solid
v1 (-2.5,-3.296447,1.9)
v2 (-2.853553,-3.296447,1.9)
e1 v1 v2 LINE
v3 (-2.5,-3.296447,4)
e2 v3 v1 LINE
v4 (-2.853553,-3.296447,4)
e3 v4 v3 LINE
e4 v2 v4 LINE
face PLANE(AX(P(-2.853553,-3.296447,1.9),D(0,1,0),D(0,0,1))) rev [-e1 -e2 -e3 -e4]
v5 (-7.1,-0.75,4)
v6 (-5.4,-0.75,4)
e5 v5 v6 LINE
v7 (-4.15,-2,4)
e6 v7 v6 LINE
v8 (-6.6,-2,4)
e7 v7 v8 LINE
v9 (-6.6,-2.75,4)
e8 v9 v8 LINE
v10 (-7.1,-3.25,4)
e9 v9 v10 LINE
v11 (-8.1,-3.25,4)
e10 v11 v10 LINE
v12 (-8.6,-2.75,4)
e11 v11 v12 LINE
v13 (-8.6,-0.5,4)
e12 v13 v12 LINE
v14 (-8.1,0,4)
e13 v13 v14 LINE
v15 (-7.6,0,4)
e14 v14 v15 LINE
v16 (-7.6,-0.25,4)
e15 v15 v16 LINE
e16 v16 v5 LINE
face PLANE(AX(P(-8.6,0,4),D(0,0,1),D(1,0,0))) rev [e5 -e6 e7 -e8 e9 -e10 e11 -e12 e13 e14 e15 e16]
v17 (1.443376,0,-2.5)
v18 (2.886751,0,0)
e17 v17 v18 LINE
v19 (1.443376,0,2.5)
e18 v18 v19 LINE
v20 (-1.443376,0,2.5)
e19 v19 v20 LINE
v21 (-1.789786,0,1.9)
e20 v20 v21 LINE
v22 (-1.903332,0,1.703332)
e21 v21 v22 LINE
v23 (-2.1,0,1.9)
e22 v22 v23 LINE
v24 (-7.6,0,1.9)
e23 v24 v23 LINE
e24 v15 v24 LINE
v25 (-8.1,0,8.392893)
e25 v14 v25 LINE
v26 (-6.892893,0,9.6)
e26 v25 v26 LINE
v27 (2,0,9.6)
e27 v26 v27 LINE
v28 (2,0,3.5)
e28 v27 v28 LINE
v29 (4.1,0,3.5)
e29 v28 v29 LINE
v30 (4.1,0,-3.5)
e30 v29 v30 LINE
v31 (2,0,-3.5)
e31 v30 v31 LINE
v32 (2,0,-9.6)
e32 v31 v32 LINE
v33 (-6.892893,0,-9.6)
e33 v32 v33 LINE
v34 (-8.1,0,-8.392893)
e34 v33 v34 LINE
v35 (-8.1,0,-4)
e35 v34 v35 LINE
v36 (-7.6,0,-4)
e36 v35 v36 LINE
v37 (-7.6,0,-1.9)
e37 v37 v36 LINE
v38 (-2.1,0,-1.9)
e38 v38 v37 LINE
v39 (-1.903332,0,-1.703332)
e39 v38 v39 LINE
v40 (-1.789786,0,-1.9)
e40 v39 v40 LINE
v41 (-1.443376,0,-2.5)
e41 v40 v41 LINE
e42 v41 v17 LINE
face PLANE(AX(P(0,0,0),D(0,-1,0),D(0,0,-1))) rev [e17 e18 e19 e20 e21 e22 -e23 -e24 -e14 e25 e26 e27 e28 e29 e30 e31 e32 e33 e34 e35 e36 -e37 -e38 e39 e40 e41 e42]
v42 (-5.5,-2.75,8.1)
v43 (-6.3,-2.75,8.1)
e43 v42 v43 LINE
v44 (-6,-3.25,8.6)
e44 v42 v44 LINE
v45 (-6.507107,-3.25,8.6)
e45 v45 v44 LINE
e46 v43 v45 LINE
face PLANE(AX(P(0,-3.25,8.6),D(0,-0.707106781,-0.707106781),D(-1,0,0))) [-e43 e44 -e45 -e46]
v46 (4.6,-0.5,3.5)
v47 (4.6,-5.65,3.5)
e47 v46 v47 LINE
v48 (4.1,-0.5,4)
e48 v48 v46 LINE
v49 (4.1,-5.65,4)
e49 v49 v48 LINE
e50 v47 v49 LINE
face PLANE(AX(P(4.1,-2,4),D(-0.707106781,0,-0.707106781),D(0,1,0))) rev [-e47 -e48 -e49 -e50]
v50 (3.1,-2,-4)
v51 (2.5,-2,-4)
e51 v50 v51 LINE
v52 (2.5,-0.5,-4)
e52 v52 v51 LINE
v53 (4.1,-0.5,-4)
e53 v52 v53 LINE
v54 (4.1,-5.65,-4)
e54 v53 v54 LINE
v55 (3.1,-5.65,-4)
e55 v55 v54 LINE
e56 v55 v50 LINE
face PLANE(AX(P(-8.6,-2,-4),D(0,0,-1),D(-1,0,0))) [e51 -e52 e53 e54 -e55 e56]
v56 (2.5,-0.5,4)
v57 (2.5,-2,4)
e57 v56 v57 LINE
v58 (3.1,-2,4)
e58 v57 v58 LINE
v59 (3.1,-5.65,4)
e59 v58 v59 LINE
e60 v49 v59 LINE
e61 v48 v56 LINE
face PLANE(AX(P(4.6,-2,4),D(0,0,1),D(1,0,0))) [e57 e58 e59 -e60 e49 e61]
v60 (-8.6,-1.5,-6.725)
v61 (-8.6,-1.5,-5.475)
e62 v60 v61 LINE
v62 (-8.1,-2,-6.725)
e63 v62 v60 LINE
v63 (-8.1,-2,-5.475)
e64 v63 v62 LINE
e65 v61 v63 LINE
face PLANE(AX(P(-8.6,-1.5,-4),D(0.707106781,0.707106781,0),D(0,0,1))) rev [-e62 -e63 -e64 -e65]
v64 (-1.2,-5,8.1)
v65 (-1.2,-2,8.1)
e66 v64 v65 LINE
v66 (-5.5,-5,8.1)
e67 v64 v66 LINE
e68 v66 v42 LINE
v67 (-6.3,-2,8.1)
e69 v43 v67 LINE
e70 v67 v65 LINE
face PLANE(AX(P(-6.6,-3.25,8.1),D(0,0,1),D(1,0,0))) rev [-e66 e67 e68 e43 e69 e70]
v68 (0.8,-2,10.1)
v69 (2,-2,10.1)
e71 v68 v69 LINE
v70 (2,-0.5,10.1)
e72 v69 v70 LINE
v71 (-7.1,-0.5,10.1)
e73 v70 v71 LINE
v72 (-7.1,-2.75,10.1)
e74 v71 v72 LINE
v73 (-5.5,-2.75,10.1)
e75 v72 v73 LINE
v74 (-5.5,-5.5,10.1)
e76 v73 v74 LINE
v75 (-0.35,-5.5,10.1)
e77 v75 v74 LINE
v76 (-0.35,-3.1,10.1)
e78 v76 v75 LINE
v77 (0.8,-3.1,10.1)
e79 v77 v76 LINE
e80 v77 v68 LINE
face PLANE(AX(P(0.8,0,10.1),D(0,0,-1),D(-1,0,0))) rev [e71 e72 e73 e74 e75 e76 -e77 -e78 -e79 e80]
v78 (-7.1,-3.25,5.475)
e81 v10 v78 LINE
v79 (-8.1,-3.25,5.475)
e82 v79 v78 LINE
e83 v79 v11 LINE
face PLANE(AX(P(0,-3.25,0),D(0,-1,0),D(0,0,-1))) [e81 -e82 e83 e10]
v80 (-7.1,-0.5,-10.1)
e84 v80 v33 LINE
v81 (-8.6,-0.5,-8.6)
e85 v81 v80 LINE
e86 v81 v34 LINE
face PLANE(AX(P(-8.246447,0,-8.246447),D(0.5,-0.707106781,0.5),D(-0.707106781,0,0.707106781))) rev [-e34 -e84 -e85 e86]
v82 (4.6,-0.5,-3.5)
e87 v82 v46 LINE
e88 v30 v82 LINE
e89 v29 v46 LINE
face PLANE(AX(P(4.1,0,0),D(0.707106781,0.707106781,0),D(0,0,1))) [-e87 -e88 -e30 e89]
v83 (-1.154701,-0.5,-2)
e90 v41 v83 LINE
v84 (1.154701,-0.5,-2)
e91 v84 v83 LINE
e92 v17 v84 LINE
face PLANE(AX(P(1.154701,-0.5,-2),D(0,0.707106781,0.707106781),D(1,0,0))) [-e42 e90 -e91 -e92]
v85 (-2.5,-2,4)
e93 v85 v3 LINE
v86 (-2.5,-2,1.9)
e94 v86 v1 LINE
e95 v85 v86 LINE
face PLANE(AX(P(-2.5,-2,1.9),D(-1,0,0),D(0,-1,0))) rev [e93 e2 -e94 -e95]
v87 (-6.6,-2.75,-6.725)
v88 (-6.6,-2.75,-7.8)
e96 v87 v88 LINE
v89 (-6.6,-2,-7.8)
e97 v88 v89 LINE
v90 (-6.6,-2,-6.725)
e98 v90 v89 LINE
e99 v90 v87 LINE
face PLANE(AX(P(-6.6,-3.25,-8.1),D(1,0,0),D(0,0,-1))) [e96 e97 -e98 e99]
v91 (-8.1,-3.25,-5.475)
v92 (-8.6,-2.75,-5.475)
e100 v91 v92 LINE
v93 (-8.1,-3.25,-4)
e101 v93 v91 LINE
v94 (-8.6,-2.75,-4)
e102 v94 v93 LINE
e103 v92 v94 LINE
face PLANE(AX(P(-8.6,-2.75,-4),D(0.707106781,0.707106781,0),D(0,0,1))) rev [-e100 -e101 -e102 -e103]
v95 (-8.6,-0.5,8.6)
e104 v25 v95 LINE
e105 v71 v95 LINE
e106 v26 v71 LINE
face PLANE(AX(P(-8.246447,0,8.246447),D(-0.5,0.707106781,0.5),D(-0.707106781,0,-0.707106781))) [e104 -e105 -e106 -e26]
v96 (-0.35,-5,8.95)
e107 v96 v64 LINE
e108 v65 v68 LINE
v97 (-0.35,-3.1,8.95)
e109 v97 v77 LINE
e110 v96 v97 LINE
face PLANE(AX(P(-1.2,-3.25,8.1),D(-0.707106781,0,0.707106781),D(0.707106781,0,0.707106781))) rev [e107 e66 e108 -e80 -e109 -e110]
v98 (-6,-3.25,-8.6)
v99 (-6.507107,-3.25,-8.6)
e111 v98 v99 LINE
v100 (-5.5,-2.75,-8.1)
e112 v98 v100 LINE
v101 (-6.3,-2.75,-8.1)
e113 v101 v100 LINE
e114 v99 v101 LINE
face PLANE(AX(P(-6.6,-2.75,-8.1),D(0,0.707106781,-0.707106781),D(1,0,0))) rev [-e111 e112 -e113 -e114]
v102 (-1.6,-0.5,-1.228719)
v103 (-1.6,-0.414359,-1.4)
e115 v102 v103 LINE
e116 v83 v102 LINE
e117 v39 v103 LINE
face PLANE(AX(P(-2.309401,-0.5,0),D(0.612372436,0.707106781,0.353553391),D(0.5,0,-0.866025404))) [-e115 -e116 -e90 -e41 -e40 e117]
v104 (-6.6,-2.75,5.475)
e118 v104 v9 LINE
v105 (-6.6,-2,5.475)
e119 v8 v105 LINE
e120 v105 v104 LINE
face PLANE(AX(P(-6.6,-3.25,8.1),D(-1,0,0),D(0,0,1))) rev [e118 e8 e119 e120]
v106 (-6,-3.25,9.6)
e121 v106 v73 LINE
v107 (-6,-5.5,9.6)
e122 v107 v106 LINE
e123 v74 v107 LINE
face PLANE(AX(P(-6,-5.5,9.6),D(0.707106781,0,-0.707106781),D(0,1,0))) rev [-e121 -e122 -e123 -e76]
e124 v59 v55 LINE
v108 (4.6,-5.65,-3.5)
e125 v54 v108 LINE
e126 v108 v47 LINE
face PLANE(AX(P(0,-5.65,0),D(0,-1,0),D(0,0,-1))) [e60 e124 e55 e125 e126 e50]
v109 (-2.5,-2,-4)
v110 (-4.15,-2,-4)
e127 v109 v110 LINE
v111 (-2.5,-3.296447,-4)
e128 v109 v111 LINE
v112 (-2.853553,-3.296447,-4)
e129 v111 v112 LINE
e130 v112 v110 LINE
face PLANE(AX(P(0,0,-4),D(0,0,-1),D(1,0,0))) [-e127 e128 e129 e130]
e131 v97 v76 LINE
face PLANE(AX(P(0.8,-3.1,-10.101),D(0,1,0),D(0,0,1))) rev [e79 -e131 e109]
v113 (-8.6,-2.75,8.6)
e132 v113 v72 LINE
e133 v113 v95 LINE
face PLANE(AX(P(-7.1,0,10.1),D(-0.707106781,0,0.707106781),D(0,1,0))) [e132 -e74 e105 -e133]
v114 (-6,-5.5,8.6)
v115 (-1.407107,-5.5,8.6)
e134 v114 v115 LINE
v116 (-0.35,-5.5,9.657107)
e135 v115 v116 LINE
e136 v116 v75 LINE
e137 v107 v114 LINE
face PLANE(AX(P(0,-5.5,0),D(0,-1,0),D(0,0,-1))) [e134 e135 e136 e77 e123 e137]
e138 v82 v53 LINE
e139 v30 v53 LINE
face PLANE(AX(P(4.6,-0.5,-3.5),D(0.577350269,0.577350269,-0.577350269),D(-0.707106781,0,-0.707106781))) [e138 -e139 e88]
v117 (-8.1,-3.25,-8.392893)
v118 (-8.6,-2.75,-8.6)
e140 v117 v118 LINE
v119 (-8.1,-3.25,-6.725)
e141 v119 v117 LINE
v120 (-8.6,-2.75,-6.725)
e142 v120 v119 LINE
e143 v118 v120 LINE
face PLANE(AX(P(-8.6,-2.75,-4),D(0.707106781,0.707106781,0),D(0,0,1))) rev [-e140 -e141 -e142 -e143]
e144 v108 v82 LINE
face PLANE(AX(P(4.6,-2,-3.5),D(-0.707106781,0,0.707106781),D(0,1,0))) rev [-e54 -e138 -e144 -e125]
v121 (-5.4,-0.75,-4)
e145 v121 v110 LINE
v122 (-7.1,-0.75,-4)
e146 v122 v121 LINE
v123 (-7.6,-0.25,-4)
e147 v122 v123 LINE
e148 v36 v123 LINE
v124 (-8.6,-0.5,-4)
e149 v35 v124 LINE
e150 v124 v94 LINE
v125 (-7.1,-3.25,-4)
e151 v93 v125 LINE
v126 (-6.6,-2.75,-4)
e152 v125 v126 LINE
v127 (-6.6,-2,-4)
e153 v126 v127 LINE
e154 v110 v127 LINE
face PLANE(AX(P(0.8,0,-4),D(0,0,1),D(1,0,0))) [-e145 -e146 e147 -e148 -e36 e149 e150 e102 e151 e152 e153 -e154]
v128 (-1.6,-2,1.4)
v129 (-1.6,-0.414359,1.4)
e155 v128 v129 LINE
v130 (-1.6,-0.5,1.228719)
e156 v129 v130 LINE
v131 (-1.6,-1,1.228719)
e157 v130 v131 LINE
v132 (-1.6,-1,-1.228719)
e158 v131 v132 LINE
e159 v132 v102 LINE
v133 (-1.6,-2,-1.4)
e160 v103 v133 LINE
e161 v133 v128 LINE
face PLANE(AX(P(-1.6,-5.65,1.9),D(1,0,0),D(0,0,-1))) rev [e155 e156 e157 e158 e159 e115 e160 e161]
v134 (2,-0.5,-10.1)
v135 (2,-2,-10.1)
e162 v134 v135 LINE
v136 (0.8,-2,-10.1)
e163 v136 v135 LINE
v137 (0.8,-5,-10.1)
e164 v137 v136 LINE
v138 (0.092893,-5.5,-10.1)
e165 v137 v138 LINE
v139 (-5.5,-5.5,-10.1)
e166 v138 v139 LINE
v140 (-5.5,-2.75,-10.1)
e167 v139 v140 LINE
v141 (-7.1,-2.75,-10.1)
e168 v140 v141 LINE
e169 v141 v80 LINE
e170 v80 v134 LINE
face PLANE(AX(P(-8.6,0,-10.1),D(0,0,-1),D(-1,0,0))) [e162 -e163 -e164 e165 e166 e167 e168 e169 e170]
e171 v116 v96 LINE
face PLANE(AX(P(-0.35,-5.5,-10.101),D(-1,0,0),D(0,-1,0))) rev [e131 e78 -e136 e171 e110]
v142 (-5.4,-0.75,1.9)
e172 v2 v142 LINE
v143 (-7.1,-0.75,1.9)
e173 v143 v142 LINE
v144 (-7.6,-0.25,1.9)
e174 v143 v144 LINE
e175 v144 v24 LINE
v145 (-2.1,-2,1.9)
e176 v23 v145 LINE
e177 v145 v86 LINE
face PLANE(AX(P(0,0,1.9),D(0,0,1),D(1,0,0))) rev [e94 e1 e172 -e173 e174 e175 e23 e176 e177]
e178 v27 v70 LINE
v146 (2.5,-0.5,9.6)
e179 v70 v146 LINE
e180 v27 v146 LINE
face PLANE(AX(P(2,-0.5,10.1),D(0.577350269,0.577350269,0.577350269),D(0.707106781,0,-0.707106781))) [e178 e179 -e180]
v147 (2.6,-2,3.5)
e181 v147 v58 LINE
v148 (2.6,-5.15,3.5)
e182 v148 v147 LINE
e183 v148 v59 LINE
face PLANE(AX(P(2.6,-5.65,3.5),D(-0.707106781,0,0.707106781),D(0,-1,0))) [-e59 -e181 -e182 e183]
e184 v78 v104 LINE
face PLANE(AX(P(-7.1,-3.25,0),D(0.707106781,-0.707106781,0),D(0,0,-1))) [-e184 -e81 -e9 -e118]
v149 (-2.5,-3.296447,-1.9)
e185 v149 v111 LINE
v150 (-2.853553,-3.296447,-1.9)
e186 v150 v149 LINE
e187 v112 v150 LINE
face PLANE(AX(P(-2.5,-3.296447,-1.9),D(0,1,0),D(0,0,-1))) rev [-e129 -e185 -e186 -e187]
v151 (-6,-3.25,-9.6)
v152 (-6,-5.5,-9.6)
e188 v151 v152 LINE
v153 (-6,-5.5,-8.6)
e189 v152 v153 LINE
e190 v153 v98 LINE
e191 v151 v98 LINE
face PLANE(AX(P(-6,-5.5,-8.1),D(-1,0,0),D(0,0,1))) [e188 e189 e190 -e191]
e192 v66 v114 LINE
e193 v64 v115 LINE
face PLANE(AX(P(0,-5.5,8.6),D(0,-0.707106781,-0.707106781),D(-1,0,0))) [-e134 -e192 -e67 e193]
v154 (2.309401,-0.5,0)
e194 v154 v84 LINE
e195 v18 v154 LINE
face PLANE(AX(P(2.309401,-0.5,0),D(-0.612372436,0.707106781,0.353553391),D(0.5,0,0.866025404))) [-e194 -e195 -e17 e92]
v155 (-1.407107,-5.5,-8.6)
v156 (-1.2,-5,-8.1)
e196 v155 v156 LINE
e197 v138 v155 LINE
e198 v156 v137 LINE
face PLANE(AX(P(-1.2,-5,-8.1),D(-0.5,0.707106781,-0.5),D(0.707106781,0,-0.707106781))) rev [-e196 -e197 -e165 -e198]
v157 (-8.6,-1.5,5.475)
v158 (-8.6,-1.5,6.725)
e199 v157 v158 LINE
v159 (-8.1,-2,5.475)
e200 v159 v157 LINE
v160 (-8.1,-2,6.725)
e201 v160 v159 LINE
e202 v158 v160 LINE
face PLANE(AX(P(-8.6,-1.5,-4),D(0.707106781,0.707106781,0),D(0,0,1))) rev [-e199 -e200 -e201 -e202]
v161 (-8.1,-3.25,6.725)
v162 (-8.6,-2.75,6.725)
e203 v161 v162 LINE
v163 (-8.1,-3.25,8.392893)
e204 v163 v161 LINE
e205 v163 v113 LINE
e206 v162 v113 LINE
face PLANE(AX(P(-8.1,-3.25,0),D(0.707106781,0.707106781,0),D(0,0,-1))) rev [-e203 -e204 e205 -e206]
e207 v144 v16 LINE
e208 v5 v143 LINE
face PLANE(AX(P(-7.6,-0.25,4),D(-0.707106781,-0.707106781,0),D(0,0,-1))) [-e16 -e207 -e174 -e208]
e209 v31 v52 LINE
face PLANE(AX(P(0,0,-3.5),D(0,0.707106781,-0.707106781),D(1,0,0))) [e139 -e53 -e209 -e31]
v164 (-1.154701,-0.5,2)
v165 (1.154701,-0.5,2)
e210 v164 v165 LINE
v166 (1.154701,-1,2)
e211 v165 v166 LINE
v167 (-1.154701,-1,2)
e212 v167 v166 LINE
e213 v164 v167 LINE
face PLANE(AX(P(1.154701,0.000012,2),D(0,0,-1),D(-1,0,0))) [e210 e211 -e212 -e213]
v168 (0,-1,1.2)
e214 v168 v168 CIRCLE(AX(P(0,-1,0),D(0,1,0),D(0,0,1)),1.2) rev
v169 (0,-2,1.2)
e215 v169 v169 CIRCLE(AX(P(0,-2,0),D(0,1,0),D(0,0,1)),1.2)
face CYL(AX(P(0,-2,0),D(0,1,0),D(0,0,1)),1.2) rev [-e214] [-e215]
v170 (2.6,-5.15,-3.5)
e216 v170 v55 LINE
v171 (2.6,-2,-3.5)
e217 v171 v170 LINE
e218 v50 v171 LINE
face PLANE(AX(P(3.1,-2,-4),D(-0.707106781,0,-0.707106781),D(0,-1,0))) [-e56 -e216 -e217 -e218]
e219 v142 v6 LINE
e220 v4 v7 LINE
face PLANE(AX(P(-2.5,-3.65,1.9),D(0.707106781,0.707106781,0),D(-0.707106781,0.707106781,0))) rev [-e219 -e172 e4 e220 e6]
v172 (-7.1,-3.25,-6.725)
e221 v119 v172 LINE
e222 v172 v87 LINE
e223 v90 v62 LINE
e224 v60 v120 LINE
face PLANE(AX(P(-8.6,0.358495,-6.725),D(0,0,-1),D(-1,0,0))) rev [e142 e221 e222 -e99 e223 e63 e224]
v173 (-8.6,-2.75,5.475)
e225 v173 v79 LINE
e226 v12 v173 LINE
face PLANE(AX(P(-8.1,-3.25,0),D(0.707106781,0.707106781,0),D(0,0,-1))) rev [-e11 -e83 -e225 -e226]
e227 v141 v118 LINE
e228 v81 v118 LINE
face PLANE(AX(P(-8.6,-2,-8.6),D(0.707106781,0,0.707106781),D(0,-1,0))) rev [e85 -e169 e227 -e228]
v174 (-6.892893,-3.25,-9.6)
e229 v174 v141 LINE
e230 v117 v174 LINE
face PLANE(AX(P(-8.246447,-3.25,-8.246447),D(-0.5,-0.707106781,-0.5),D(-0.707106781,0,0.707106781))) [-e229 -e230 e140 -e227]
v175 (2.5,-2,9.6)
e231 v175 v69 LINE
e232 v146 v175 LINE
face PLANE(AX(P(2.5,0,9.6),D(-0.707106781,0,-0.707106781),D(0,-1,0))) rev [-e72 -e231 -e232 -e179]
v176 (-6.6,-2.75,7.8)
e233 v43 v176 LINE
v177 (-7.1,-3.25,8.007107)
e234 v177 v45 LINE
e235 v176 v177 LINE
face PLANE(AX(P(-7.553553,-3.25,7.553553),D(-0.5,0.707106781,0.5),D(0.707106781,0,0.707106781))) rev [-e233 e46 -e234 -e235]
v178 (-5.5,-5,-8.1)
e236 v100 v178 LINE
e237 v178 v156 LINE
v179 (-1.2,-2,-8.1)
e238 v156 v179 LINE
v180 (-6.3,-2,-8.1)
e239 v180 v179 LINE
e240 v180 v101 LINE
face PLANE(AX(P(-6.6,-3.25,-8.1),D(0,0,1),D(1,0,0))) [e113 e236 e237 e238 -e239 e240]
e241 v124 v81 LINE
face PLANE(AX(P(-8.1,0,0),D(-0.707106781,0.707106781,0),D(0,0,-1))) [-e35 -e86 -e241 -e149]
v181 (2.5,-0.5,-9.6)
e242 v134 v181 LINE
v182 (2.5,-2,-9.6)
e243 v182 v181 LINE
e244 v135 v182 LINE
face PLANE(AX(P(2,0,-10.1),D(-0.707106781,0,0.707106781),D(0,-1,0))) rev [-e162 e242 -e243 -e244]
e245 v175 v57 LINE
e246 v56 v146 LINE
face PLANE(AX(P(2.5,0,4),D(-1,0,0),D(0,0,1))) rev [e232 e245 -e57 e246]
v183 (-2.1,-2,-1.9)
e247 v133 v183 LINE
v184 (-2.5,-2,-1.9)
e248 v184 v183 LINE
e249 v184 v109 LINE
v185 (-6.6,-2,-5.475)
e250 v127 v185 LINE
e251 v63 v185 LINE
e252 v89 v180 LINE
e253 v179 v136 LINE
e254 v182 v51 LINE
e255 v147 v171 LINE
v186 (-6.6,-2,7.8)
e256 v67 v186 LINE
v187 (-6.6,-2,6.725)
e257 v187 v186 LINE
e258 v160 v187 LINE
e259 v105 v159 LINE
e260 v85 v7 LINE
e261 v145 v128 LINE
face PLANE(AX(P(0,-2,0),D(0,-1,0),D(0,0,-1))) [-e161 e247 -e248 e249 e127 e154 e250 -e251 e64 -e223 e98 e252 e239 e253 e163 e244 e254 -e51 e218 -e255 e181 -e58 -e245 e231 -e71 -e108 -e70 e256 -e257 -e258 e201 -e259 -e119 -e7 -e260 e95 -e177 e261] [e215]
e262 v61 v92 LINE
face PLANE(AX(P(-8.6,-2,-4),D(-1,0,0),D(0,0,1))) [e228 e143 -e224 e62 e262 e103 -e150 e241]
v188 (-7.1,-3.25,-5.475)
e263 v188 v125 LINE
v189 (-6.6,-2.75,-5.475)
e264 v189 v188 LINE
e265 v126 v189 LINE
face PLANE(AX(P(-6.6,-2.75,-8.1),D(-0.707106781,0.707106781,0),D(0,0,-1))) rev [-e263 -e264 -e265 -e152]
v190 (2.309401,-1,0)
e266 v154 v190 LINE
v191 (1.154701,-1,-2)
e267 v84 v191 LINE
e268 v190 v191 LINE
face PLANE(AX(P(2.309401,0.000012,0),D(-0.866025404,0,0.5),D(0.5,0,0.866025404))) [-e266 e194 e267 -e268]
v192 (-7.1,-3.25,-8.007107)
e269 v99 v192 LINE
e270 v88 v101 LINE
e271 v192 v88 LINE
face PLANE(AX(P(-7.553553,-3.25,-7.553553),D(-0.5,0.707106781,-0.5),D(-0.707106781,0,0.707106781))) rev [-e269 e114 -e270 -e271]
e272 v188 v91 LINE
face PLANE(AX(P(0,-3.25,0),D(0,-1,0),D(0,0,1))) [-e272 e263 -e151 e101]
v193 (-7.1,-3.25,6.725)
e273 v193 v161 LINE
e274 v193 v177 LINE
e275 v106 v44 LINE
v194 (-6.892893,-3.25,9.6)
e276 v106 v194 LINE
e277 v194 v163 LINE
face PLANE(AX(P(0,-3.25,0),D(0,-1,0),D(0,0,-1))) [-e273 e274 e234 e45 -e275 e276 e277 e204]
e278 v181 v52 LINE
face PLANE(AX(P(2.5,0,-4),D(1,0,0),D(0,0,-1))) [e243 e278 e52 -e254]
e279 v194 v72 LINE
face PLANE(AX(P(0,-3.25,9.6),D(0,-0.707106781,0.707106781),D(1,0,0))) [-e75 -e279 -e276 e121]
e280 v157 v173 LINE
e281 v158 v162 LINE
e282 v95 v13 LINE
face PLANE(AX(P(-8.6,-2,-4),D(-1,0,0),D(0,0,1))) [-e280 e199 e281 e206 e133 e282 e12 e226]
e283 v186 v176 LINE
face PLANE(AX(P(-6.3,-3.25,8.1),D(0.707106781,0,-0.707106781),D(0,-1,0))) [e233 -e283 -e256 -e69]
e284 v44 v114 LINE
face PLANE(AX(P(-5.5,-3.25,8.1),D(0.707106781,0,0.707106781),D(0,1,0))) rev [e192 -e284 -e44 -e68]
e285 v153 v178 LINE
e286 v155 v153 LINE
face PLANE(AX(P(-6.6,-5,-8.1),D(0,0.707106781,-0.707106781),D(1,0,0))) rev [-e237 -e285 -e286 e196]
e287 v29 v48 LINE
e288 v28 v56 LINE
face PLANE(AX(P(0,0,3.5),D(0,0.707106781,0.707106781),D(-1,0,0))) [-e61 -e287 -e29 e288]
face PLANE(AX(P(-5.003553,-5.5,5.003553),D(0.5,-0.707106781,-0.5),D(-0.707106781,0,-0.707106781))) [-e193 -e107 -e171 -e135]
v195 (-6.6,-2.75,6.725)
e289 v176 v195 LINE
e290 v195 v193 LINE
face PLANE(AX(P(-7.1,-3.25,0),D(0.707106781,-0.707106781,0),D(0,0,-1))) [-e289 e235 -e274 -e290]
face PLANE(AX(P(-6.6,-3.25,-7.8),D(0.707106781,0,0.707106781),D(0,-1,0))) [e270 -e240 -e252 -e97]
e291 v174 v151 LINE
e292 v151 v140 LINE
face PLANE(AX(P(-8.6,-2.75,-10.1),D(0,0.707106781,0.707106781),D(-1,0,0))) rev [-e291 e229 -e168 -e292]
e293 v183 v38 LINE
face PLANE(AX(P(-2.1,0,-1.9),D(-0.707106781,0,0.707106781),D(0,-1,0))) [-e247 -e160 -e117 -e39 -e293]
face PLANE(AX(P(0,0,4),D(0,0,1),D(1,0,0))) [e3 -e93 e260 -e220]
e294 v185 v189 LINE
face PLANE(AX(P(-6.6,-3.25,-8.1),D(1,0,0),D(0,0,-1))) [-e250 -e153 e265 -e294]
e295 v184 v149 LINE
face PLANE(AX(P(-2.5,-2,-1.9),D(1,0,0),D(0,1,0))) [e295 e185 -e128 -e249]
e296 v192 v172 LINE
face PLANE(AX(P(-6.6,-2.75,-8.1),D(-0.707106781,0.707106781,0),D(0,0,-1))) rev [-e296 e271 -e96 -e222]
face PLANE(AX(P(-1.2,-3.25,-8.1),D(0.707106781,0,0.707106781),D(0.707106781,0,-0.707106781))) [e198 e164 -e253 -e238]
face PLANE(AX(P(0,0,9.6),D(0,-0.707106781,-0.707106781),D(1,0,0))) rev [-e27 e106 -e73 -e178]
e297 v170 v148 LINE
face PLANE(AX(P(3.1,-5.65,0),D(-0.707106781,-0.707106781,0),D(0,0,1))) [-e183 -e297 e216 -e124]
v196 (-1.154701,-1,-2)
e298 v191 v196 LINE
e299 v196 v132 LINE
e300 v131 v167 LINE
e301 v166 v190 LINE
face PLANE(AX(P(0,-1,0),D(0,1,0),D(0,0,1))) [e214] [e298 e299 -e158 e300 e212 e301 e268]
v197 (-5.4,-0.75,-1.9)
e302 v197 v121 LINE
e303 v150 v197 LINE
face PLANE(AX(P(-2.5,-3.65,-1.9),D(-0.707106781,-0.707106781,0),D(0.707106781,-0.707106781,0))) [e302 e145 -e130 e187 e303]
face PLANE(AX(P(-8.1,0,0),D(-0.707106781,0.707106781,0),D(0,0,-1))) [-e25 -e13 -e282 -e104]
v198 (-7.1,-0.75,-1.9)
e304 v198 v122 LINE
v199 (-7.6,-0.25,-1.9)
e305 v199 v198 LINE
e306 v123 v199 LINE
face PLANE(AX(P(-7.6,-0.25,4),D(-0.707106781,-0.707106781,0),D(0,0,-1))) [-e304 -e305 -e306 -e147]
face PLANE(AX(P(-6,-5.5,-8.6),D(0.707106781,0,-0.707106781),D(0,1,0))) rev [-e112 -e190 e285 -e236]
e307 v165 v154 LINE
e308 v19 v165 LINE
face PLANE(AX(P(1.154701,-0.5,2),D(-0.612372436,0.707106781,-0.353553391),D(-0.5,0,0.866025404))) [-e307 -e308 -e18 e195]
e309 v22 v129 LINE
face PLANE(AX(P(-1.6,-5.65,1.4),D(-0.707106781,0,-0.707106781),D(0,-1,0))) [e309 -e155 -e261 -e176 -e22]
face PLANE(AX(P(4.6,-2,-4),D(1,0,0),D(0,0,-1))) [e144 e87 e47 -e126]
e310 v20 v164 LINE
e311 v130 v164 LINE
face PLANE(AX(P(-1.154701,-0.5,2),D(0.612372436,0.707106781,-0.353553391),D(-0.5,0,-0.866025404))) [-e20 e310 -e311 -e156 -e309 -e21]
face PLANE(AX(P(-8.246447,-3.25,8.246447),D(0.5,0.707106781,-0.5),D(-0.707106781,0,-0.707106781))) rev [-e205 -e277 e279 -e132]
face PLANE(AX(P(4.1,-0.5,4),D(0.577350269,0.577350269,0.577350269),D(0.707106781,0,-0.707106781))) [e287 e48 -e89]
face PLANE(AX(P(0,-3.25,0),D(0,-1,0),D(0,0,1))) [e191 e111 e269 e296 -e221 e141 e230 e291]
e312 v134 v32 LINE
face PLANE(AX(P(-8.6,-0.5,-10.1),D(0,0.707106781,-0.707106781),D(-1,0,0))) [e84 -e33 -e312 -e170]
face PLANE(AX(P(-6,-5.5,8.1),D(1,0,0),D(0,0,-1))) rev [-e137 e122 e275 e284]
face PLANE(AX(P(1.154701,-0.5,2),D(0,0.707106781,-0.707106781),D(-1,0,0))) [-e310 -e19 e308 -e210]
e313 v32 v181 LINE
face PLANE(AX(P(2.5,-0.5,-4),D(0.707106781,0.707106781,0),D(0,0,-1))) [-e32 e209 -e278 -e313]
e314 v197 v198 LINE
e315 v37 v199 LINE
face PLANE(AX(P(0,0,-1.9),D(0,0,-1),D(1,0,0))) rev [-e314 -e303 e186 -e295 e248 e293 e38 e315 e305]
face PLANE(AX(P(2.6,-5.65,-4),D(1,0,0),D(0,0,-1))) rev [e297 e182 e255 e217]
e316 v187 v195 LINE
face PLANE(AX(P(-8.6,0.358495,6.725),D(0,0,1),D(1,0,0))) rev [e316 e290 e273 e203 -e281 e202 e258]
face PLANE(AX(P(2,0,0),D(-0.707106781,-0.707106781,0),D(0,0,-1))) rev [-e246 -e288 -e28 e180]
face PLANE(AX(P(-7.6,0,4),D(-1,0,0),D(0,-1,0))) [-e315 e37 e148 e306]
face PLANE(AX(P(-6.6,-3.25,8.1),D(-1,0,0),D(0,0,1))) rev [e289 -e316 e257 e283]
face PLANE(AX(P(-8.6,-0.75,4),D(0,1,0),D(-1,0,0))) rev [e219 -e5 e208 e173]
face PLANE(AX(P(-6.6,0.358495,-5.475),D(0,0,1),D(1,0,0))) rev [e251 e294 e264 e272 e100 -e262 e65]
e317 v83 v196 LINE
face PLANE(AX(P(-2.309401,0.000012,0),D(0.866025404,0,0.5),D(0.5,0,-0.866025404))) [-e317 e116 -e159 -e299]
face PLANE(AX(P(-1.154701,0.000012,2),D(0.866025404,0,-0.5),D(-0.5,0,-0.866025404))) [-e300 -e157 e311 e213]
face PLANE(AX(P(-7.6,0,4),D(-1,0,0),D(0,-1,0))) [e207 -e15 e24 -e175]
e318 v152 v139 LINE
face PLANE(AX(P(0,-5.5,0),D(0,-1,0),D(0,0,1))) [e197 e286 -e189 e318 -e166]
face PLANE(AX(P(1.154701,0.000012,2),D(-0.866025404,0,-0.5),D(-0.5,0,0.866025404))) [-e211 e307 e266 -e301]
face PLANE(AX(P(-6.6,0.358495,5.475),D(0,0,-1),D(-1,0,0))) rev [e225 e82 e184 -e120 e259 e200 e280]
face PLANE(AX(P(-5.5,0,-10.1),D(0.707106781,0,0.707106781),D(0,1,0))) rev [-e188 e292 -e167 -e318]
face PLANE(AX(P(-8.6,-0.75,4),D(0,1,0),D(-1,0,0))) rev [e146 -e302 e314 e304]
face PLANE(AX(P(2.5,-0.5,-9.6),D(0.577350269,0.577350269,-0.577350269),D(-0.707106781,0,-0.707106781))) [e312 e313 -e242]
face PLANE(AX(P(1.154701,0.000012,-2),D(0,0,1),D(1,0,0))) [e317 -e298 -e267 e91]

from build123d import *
from OCP.BRepFilletAPI import BRepFilletAPI_MakeChamfer

# Parameters (mm, degrees)
SKETCH1_W                = 13.2
SKETCH1_H                = 8
BOSS_EXTRUDE1_DEPTH      = 2
CUT_EXTRUDE1_DEPTH       = 12.914696807
CUT_EXTRUDE1_DEPTH_BACK  = 12.914696807
SKETCH3_W                = 2
SKETCH3_H                = 8
BOSS_EXTRUDE2_DEPTH      = 3.65
BOSS_EXTRUDE3_DEPTH      = 2
BOSS_EXTRUDE4_DEPTH      = 1.25
BOSS_EXTRUDE5_DEPTH      = 2.1
BOSS_EXTRUDE6_DEPTH      = 2.25
CHAMFER3_SIZE            = 1.5
CHAMFER4_SIZE            = 0.3
CHAMFER3_OF_MIRROR1_SIZE = 1.5
CHAMFER4_OF_MIRROR1_SIZE = 0.3
CUT_EXTRUDE2_DEPTH       = 15.141428499
CUT_EXTRUDE2_DEPTH_BACK  = 15.141428499
SKETCH10_W               = 1
SKETCH10_H               = 8
CUT_EXTRUDE3_DEPTH       = 15.418477728
CUT_EXTRUDE3_DEPTH_BACK  = 1
SKETCH12_W               = 6
SKETCH12_H               = 3.8
CUT_EXTRUDE4_DEPTH       = 15.418477728
CUT_EXTRUDE5_REACH       = 24.67
SKETCH13_W               = 1.15
SKETCH13_H               = 2.4
CHAMFER7_SIZE            = 0.5
CHAMFER7_SIZE_2          = 0.353553391
CUT_EXTRUDE6_REACH       = 15.658
SKETCH14_W               = 2
SKETCH14_H               = 1.25
CHAMFER8_SIZE            = 0.5


with BuildPart() as part:
    # Sketch1 → Boss-Extrude1 (new body)
    with BuildSketch(Plane(origin=(0, 0, 0), x_dir=(1, 0, 0), z_dir=(0, 1, 0))):
        with Locations((-2, 0)):
            Rectangle(SKETCH1_W, SKETCH1_H)
        with BuildLine():
            ThreePointArc((0, 1.2), (-1.2, 0), (0, -1.2))
            ThreePointArc((0, -1.2), (0.848528137, -0.848528137), (1.2, 0))
            ThreePointArc((1.2, 0), (0.848528137, 0.848528137), (0, 1.2))
        make_face(mode=Mode.SUBTRACT)
    extrude(amount=-BOSS_EXTRUDE1_DEPTH)

    # Sketch2 → Cut-Extrude1 (cut, two sides: drawn at the far end of the back side and taken through both)
    with BuildSketch(Plane(origin=(0, 0, -4), x_dir=(-1, 0, 0), z_dir=(0, 0, -1)).offset(-CUT_EXTRUDE1_DEPTH_BACK)):
        Polygon((8.6, -2), (8.6, -0.75), (3.75, -0.75), (2.5, -2), align=None)
    extrude(amount=CUT_EXTRUDE1_DEPTH + CUT_EXTRUDE1_DEPTH_BACK, mode=Mode.SUBTRACT)

    # Sketch3 → Boss-Extrude2 (add)
    with BuildSketch(Plane.XZ.offset(2)):
        with Locations((3.6, 0)):
            Rectangle(SKETCH3_W, SKETCH3_H)
    extrude(amount=BOSS_EXTRUDE2_DEPTH)

    # Sketch4 → Boss-Extrude3 (add)
    with BuildSketch(Plane(origin=(0, -2, 2), x_dir=(1, 0, 0), z_dir=(0, 1, 0))):
        Polygon((-8.6, -8.1), (0.8, -8.1), (2.5, -8.1), (2.5, -2), (0.8, -2), (-8.6, -2), align=None)
    boss_extrude3 = extrude(amount=BOSS_EXTRUDE3_DEPTH)

    # Sketch5 → Boss-Extrude4 (add)
    with BuildSketch(Plane.XZ.offset(2)):
        Polygon((-8.6, 10.1), (-6.6, 10.1), (-1.2, 10.1), (0.8, 10.1), (-1.2, 8.1), (-6.6, 8.1), (-6.6, 4), (-8.6, 4), align=None)
    boss_extrude4 = extrude(amount=BOSS_EXTRUDE4_DEPTH)

    # Sketch6 → Boss-Extrude5 (add)
    with BuildSketch(Plane(origin=(0, 0, 4), x_dir=(-1, 0, 0), z_dir=(0, 0, -1))):
        Polygon((2.5, -2), (2.5, -3.65), (5.4, -0.75), (3.75, -0.75), align=None)
    boss_extrude5 = extrude(amount=BOSS_EXTRUDE5_DEPTH)

    # Sketch8 → Boss-Extrude6 (add)
    with BuildSketch(Plane.XZ.offset(3.25)):
        Polygon((0.8, 10.1), (-1.2, 8.1), (-6, 8.1), (-6, 10.1), align=None)
    boss_extrude6 = extrude(amount=BOSS_EXTRUDE6_DEPTH)

    # Chamfer3
    chamfer3_edges = [part.edges().sort_by_distance(p)[0] for p in [
        (-8.6, -1.625, 10.1),
    ]]
    chamfer(chamfer3_edges, length=CHAMFER3_SIZE)

    # Chamfer4
    chamfer4_edges = [part.edges().sort_by_distance(p)[0] for p in [
        (-6.6, -2.625, 8.1),
    ]]
    chamfer(chamfer4_edges, length=CHAMFER4_SIZE)

    # Mirror1: Boss-Extrude3, Boss-Extrude4, Boss-Extrude5, Boss-Extrude6 across plane
    add(boss_extrude3.mirror(Plane.XY))
    add(boss_extrude4.mirror(Plane.XY))
    add(boss_extrude5.mirror(Plane.XY))
    add(boss_extrude6.mirror(Plane.XY))

    # Chamfer3 of Mirror1
    chamfer3_of_mirror1_edges = [part.edges().sort_by_distance(p)[0] for p in [
        (-8.6, -1.625, -10.1),
    ]]
    chamfer(chamfer3_of_mirror1_edges, length=CHAMFER3_OF_MIRROR1_SIZE)

    # Chamfer4 of Mirror1
    chamfer4_of_mirror1_edges = [part.edges().sort_by_distance(p)[0] for p in [
        (-6.6, -2.625, -8.1),
    ]]
    chamfer(chamfer4_of_mirror1_edges, length=CHAMFER4_OF_MIRROR1_SIZE)

    # Sketch10 → Cut-Extrude2 (cut, two sides: drawn at the far end of the back side and taken through both)
    with BuildSketch(Plane.XZ.offset(0.75).offset(-CUT_EXTRUDE2_DEPTH_BACK)):
        with Locations((-8.1, 0)):
            Rectangle(SKETCH10_W, SKETCH10_H)
    extrude(amount=CUT_EXTRUDE2_DEPTH + CUT_EXTRUDE2_DEPTH_BACK, mode=Mode.SUBTRACT)

    # Sketch11 → Cut-Extrude3 (cut, two sides: drawn at the far end of the back side and taken through both)
    with BuildSketch(Plane(origin=(0, 0, 0), x_dir=(1, 0, 0), z_dir=(0, 1, 0)).offset(-CUT_EXTRUDE3_DEPTH_BACK)):
        Polygon((1.154700538, -2), (-1.154700538, -2), (-1.212435565, -1.9), (-2.309401077, 0), (-1.212435565, 1.9), (-1.154700538, 2), (1.154700538, 2), (2.309401077, 0), align=None)
    extrude(amount=CUT_EXTRUDE3_DEPTH + CUT_EXTRUDE3_DEPTH_BACK, mode=Mode.SUBTRACT)

    # Sketch12 → Cut-Extrude4 (cut, through all)
    with BuildSketch(Plane(origin=(0, 0, 0), x_dir=(1, 0, 0), z_dir=(0, 1, 0))):
        with Locations((-4.6, 0)):
            Rectangle(SKETCH12_W, SKETCH12_H)
    extrude(amount=-CUT_EXTRUDE4_DEPTH, mode=Mode.SUBTRACT)

    # Sketch13 → Cut-Extrude5 (cut, up to next)
    with BuildSketch(Plane.XY.offset(10.1), mode=Mode.PRIVATE) as cut_extrude5_sk1:
        with Locations((0.225, -4.3)):
            Rectangle(SKETCH13_W, SKETCH13_H)
    cut_extrude5_tool1 = extrude(cut_extrude5_sk1.sketch, amount=-CUT_EXTRUDE5_REACH, mode=Mode.PRIVATE) & part.part
    add(cut_extrude5_tool1.solids().sort_by_distance((0.225, -4.3, 10.1))[0], mode=Mode.SUBTRACT)

    # Chamfer7
    chamfer7_edges = [part.edges().sort_by_distance(p)[0] for p in [
        (-1.6, -1, 1.9),
        (-1.6, -1, -1.9),
    ]]
    chamfer(chamfer7_edges, length=CHAMFER7_SIZE)
    chamfer7_2_edges_1 = [part.edges().sort_by_distance(p)[0] for p in [
        (-6.6, -3.25, -5.9),
        (-6.45, -3.25, -7.95),
        (-6.15, -3.25, -8.1),
        (-6.15, -3.25, 8.1),
        (-6.45, -3.25, 7.95),
        (-6.6, -3.25, 5.9),
        (-8.6, -3.25, 6.3),
        (-7.85, -3.25, 9.35),
        (-6.55, -3.25, 10.1),
        (-6, -4.375, 10.1),
        (-6, -4.375, -10.1),
        (-6.55, -3.25, -10.1),
        (-7.85, -3.25, -9.35),
        (-8.6, -3.25, -6.3),
        (-3.6, -5.5, 8.1),
        (-0.775, -5.5, 8.525),
        (-0.2, -5.5, -9.1),
        (-3.6, -5.5, -8.1),
        (2.6, -3.825, 4),
        (2.6, -3.825, -4),
        (2.6, -5.65, 0),
        (-1.377350269, 0, 1.614359354),
        (0, 0, 2),
        (1.732050808, 0, 1),
        (1.732050808, 0, -1),
        (0, 0, -2),
        (-1.377350269, 0, -1.614359354),
        (4.6, -2.825, -4),
        (4.6, -2.825, 4),
        (-8.6, 0, -6.3),
        (-7.85, 0, -9.35),
        (-8.6, 0, 6.3),
        (-7.85, 0, 9.35),
        (-2.3, 0, -10.1),
        (2.5, 0, -7.05),
        (3.55, 0, -4),
        (4.6, 0, 0),
        (3.55, 0, 4),
        (2.5, 0, 7.05),
        (-2.3, 0, 10.1),
        (2.5, -1, -10.1),
        (2.5, -1, 10.1),
        (-6, -4.375, 8.1),
        (-6, -4.375, -8.1),
        (-7.6, -0.75, 2.95),
        (-7.6, -0.75, -2.95),
    ]]
    chamfer7_2_edges_2 = [part.edges().sort_by_distance(p)[0] for p in [
        (-2.5, -3.65, -2.95),
    ]]
    chamfer7_2_side_2 = [part.faces().sort_by_distance(p)[0] for p in [
        (-2.5, -3.642928932, -2.95),
    ]]
    chamfer7_2_edges_3 = [part.edges().sort_by_distance(p)[0] for p in [
        (-2.5, -3.65, 2.95),
    ]]
    chamfer7_2_side_3 = [part.faces().sort_by_distance(p)[0] for p in [
        (-2.5, -3.642928932, 2.95),
    ]]
    chamfer7_2 = BRepFilletAPI_MakeChamfer(part.part.solid().wrapped)
    for e in chamfer7_2_edges_1:
        chamfer7_2.Add(CHAMFER7_SIZE, e.wrapped)
    for e in chamfer7_2_edges_2:
        chamfer7_2.Add(CHAMFER7_SIZE_2, CHAMFER7_SIZE, e.wrapped, chamfer7_2_side_2[0].wrapped)
    for e in chamfer7_2_edges_3:
        chamfer7_2.Add(CHAMFER7_SIZE_2, CHAMFER7_SIZE, e.wrapped, chamfer7_2_side_3[0].wrapped)
    add(Compound.cast(chamfer7_2.Shape()), mode=Mode.REPLACE)

    # Cut-Extrude6: up to this face of the body (flat: up to its plane)
    cut_extrude6_end = Plane(part.part.faces().sort_by_distance((1.4, -2, 9.875917426))[0])
    # Sketch14 → Cut-Extrude6 (cut, up to the picked face)
    with BuildSketch(Plane.XZ.offset(3.25), mode=Mode.PRIVATE) as cut_extrude6_sk1:
        with Locations((-7.6, -6.1)):
            Rectangle(SKETCH14_W, SKETCH14_H)
    cut_extrude6_tool1 = split(extrude(cut_extrude6_sk1.sketch, amount=-CUT_EXTRUDE6_REACH, mode=Mode.PRIVATE), bisect_by=cut_extrude6_end, keep=Keep.BOTH, mode=Mode.PRIVATE)
    # Sketch14 → Cut-Extrude6 (cut, up to the picked face)
    with BuildSketch(Plane.XZ.offset(3.25), mode=Mode.PRIVATE) as cut_extrude6_sk2:
        with Locations((-7.6, 6.1)):
            Rectangle(SKETCH14_W, SKETCH14_H)
    cut_extrude6_tool2 = split(extrude(cut_extrude6_sk2.sketch, amount=-CUT_EXTRUDE6_REACH, mode=Mode.PRIVATE), bisect_by=cut_extrude6_end, keep=Keep.BOTH, mode=Mode.PRIVATE)
    add(cut_extrude6_tool1.solids().sort_by(Axis((-7.6, -3.25, -6.1), (0, 1, 0)))[0], mode=Mode.SUBTRACT)
    add(cut_extrude6_tool2.solids().sort_by(Axis((-7.6, -3.25, 6.1), (0, 1, 0)))[0], mode=Mode.SUBTRACT)

    # Chamfer8
    chamfer8_edges = [part.edges().sort_by_distance(p)[0] for p in [
        (-8.6, -2, -6.1),
        (-8.6, -2, 6.1),
    ]]
    chamfer(chamfer8_edges, length=CHAMFER8_SIZE)


solid = part.part
